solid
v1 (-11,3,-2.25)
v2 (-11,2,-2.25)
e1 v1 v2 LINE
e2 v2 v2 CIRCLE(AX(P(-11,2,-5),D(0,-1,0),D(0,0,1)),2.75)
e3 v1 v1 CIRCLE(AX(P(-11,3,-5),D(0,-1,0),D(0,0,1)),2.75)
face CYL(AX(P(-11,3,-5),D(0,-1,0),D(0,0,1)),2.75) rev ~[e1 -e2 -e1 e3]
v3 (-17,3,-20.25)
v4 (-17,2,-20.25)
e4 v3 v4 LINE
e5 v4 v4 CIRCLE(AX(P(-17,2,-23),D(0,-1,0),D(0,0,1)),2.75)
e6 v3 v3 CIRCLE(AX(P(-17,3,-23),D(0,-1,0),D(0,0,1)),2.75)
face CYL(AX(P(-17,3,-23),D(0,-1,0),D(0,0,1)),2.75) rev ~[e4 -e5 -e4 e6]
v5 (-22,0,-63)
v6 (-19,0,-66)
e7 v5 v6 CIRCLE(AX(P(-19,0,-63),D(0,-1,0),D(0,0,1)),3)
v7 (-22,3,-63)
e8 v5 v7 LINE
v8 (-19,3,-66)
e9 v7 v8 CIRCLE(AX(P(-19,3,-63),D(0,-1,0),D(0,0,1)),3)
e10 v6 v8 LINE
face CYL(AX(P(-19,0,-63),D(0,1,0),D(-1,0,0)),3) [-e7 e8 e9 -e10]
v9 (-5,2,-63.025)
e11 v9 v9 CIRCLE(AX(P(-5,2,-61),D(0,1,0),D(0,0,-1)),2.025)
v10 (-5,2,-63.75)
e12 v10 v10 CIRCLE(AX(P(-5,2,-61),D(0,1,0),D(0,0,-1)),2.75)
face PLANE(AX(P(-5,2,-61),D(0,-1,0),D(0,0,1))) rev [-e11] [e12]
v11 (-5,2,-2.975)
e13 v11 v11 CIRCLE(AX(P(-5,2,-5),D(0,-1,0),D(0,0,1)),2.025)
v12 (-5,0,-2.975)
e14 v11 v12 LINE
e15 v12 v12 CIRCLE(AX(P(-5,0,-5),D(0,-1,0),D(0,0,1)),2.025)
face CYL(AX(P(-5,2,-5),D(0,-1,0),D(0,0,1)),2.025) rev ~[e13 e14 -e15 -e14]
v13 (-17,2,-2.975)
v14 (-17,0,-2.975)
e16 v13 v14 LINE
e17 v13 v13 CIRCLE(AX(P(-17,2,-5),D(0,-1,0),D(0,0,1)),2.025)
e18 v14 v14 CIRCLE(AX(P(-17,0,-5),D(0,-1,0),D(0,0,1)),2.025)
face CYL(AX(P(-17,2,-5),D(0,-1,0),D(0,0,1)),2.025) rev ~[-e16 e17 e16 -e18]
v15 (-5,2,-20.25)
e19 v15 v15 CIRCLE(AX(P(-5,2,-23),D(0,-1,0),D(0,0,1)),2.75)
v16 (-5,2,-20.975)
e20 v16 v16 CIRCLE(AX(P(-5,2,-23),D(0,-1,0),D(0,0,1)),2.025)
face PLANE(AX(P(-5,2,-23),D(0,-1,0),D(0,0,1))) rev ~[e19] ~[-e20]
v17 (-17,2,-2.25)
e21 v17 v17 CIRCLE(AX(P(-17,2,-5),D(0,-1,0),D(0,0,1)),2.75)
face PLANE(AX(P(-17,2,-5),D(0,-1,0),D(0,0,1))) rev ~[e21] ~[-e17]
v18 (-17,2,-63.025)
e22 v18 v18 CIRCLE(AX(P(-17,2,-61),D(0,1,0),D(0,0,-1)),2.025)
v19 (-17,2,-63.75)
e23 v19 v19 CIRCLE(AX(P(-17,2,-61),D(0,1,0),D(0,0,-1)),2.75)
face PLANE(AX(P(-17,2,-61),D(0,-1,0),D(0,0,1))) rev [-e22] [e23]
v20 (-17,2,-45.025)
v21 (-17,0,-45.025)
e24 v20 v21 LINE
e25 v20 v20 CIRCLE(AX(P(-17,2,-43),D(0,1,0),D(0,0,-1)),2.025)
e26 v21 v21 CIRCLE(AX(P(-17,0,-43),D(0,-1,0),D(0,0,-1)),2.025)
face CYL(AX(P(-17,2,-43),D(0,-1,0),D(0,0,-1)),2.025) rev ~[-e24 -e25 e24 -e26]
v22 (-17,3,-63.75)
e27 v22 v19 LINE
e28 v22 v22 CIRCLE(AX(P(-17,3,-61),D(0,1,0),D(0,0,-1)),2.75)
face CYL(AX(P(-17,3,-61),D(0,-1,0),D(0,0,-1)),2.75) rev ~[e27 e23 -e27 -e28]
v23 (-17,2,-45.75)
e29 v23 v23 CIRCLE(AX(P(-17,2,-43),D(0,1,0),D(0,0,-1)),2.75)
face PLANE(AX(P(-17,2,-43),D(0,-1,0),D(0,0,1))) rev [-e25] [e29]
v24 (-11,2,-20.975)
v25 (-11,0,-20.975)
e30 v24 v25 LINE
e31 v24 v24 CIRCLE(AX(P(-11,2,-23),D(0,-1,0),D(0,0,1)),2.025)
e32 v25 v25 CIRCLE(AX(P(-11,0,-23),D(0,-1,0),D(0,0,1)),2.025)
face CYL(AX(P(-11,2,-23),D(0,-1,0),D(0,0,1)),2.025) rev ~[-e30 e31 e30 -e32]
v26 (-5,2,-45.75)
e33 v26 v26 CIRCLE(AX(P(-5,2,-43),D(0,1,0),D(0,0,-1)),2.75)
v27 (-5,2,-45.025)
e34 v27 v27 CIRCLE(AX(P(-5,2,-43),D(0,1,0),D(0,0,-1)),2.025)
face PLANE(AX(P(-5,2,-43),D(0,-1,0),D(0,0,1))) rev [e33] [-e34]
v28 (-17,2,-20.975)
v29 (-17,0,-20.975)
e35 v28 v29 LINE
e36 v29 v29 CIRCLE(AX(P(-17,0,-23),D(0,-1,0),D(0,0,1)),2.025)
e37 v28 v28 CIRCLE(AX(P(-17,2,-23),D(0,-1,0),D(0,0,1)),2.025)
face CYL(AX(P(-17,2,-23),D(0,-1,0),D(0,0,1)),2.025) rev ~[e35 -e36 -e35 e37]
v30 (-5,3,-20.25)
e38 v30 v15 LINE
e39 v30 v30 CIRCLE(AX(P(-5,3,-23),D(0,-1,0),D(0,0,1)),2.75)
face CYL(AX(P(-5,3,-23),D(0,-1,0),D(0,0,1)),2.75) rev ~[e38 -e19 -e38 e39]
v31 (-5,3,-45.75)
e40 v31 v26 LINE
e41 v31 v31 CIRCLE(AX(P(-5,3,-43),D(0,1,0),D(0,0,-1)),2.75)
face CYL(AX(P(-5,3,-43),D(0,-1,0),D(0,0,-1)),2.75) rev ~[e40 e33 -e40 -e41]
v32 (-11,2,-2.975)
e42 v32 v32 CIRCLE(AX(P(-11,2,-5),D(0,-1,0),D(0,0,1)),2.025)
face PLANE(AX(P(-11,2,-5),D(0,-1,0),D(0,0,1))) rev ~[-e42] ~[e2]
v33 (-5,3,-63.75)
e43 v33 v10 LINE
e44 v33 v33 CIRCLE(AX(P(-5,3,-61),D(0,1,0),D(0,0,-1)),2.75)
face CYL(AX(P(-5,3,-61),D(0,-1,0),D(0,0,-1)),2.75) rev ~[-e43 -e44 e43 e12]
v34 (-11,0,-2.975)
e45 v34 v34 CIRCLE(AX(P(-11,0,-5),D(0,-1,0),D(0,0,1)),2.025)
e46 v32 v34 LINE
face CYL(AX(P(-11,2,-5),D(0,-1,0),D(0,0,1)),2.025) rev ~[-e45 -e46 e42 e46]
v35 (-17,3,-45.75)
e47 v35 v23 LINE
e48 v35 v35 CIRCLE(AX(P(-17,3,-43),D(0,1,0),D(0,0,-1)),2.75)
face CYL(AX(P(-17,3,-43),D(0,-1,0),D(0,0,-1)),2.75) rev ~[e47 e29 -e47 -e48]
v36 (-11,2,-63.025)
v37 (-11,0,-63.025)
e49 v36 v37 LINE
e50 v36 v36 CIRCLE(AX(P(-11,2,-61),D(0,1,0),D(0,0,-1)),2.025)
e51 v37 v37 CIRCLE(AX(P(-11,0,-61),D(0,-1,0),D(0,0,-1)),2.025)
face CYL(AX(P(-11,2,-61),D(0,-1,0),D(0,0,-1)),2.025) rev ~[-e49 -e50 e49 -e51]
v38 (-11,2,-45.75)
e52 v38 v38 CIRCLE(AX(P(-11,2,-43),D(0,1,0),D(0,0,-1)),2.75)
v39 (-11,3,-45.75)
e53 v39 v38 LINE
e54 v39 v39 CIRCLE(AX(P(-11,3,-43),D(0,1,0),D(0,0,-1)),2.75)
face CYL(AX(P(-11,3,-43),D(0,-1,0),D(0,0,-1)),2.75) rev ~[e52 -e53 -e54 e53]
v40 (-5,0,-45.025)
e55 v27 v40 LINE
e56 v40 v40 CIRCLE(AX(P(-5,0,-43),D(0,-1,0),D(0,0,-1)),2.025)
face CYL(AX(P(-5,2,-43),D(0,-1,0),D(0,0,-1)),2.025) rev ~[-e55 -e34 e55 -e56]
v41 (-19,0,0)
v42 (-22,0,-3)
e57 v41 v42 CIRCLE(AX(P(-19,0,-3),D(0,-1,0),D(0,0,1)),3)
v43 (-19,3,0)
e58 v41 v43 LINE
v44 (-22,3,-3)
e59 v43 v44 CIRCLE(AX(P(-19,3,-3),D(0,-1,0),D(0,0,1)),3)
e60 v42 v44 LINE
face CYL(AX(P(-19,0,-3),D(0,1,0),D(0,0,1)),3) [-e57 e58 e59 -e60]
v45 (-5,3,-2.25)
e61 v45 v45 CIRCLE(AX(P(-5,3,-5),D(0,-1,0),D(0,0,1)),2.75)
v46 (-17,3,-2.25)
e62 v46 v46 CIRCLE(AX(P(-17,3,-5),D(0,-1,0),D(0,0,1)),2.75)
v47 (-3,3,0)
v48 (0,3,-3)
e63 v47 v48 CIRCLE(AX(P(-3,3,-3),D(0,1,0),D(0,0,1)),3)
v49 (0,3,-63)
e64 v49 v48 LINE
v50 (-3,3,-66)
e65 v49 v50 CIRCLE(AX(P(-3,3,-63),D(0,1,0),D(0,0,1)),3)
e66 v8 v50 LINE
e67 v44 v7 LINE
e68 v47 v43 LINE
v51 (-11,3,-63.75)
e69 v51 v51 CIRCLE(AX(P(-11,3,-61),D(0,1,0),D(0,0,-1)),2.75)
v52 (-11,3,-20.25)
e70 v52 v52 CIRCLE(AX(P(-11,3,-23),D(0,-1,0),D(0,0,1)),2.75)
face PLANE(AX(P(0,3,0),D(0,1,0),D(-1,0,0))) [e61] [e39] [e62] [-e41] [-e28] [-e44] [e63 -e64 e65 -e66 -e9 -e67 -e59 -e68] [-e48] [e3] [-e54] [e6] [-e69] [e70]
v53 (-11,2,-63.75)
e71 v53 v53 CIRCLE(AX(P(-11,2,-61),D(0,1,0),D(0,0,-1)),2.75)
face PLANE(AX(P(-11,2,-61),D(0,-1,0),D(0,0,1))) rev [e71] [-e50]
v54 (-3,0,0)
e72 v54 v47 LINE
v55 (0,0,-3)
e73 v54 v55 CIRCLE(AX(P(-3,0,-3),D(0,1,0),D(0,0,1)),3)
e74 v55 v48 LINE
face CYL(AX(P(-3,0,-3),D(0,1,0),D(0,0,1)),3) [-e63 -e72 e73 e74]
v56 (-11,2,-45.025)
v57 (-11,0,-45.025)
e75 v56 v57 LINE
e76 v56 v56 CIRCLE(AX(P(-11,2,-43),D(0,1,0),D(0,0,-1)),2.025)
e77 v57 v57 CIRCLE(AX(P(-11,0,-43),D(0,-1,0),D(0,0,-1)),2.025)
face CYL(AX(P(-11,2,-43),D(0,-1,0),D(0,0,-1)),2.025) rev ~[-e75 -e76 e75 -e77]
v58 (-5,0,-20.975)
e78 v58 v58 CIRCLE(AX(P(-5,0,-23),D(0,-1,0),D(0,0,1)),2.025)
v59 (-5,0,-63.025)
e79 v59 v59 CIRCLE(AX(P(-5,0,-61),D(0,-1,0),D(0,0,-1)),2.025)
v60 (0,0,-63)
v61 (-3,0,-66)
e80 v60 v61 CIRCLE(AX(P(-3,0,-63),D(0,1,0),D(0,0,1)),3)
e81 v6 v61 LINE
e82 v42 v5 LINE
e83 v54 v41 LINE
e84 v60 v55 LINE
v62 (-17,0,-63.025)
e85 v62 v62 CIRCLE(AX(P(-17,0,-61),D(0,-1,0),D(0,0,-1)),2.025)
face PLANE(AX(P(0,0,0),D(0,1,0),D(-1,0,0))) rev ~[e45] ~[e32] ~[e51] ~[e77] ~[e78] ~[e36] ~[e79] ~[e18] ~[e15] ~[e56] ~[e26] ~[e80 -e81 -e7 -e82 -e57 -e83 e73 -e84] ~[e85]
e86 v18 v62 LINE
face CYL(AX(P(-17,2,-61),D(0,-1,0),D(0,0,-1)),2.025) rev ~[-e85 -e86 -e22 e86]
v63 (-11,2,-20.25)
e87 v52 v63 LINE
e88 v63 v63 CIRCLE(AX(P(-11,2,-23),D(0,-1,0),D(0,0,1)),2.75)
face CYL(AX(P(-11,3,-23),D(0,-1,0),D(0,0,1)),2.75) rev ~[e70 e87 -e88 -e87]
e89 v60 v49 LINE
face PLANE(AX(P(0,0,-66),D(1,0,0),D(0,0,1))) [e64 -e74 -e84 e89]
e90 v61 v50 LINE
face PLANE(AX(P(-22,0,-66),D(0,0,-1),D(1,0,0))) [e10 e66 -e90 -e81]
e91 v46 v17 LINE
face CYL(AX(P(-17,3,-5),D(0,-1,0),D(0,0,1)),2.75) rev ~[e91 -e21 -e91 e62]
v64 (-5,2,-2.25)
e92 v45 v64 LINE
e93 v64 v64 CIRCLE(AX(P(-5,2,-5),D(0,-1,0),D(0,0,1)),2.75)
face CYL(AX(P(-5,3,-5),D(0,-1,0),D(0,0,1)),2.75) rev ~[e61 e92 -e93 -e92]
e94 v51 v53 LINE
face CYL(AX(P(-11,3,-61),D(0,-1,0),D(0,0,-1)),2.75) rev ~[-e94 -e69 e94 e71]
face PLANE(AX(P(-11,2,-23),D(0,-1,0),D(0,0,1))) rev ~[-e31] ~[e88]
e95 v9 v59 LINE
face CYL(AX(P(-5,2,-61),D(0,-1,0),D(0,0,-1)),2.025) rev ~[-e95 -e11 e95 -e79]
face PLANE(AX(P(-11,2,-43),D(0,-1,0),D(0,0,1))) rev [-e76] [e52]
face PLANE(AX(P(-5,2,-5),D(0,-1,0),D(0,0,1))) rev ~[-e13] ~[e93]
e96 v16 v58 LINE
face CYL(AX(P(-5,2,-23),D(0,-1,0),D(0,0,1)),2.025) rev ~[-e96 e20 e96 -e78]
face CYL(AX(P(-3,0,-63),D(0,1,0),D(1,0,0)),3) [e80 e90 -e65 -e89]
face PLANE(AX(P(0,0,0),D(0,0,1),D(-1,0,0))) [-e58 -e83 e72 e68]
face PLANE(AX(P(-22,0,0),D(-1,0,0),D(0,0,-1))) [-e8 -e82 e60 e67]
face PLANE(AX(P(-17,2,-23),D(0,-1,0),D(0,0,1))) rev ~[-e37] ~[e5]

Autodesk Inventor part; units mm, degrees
ref_plane "YZ Plane" through (0, 0, 0) normal (1, 0, 0) x (0, 1, 0)
ref_plane "XZ Plane" through (0, 0, 0) normal (0, 1, 0) x (-1, 0, 0)
ref_plane "XY Plane" through (0, 0, 0) normal (0, 0, 1) x (1, 0, 0)
sketch "Esquisse1" plane through (0, 0, 0) normal (0, 1, 0) x (-1, 0, 0)
  line L0 (0, 0) -> (22, 0)
  line L1 (22, 0) -> (22, -66)
  line L2 (22, -66) -> (0, -66)
  line L3 (0, -66) -> (0, 0)
  dimension "d0" = 66
  dimension "d1" = 22
extrude "Plaque1" add sketch "Esquisse1" along normal blind 3
sketch "Esquisse2" plane through (0, 3, 0) normal (0, 1, 0) x (1, 0, 0)
  line L0 (-22, 0) -> (-22, 66) construction
  line L1 (0, 0) -> (-22, 0) construction
  line L2 (0, 66) -> (0, 0) construction
  line L3 (-22, 66) -> (0, 66) construction
  line L4 (-22, 0) -> (-22, 66) construction
  line L5 (-22, 5) -> (0, 5) construction
  line L6 (0, 66) -> (0, 0) construction
  point P0 (-11, 5)
  point P1 (-17, 5)
  point P2 (-5, 5)
  dimension "d3" = 6
  dimension "d4" = 6
  dimension "d5" = 5
hole "Perçage1" at (-11, 3, -5) at (-17, 3, -5) at (-5, 3, -5) direction (0, -1, 0) diameter 4.05 end through all counterbore diameter 5.5 counterbore depth 1
pattern_linear "Réseau rectangulaire1" count 2 spacing 18 along (0, 0, -1) of "Perçage1"
ref_plane "Plan de construction1" through (-22, 0, -33) normal (0, 0, 1) x (1, 0, 0)
mirror "Symétrie1" about plane through (-22, 0, -33) normal (0, 0, 1) of "Perçage1", "Réseau rectangulaire1"
fillet "Congé1" radius 3 4 edges at (0, 1.5, 0) (0, 1.5, -66) (-22, 1.5, -66) (-22, 1.5, 0)
equation "\"d3\" = ollo_spacing"
equation "\"d4\" = ollo_spacing"
equation "\"d6\" = ollo_hole"
equation "\"d8\" = ollo_ring"
equation "\"d9\" = ollo_depth"
equation "\"d11\" = Epaisseur"
equation "\"d15\" = 3 * ollo_spacing"
equation "\"LargeurGrugeage\" = Epaisseur"
equation "\"ProfondeurGrugeage\" = 0.5 * Epaisseur"
equation "\"TailleGrugeage\" = 4 * Epaisseur"
equation "\"RestesMinimum\" = 2 * Epaisseur"
equation "\"Rayondetransition\" = RayonPli"
equation "\"TailleRayonJacobi\" = RayonPli"
equation "\"TailleJeu\" = Epaisseur"
equation "\"d2\" = RayonPli"
equation "\"ollo_hole\" = 4.05"
equation "\"ollo_ring\" = 5.5"
equation "\"ollo_depth\" = 1"
equation "\"Epaisseur\" = 3"
equation "\"ollo_spacing\" = 6"
equation "\"RayonPli\" = 4"
properties part number "side" material "Plastique PMMA"
